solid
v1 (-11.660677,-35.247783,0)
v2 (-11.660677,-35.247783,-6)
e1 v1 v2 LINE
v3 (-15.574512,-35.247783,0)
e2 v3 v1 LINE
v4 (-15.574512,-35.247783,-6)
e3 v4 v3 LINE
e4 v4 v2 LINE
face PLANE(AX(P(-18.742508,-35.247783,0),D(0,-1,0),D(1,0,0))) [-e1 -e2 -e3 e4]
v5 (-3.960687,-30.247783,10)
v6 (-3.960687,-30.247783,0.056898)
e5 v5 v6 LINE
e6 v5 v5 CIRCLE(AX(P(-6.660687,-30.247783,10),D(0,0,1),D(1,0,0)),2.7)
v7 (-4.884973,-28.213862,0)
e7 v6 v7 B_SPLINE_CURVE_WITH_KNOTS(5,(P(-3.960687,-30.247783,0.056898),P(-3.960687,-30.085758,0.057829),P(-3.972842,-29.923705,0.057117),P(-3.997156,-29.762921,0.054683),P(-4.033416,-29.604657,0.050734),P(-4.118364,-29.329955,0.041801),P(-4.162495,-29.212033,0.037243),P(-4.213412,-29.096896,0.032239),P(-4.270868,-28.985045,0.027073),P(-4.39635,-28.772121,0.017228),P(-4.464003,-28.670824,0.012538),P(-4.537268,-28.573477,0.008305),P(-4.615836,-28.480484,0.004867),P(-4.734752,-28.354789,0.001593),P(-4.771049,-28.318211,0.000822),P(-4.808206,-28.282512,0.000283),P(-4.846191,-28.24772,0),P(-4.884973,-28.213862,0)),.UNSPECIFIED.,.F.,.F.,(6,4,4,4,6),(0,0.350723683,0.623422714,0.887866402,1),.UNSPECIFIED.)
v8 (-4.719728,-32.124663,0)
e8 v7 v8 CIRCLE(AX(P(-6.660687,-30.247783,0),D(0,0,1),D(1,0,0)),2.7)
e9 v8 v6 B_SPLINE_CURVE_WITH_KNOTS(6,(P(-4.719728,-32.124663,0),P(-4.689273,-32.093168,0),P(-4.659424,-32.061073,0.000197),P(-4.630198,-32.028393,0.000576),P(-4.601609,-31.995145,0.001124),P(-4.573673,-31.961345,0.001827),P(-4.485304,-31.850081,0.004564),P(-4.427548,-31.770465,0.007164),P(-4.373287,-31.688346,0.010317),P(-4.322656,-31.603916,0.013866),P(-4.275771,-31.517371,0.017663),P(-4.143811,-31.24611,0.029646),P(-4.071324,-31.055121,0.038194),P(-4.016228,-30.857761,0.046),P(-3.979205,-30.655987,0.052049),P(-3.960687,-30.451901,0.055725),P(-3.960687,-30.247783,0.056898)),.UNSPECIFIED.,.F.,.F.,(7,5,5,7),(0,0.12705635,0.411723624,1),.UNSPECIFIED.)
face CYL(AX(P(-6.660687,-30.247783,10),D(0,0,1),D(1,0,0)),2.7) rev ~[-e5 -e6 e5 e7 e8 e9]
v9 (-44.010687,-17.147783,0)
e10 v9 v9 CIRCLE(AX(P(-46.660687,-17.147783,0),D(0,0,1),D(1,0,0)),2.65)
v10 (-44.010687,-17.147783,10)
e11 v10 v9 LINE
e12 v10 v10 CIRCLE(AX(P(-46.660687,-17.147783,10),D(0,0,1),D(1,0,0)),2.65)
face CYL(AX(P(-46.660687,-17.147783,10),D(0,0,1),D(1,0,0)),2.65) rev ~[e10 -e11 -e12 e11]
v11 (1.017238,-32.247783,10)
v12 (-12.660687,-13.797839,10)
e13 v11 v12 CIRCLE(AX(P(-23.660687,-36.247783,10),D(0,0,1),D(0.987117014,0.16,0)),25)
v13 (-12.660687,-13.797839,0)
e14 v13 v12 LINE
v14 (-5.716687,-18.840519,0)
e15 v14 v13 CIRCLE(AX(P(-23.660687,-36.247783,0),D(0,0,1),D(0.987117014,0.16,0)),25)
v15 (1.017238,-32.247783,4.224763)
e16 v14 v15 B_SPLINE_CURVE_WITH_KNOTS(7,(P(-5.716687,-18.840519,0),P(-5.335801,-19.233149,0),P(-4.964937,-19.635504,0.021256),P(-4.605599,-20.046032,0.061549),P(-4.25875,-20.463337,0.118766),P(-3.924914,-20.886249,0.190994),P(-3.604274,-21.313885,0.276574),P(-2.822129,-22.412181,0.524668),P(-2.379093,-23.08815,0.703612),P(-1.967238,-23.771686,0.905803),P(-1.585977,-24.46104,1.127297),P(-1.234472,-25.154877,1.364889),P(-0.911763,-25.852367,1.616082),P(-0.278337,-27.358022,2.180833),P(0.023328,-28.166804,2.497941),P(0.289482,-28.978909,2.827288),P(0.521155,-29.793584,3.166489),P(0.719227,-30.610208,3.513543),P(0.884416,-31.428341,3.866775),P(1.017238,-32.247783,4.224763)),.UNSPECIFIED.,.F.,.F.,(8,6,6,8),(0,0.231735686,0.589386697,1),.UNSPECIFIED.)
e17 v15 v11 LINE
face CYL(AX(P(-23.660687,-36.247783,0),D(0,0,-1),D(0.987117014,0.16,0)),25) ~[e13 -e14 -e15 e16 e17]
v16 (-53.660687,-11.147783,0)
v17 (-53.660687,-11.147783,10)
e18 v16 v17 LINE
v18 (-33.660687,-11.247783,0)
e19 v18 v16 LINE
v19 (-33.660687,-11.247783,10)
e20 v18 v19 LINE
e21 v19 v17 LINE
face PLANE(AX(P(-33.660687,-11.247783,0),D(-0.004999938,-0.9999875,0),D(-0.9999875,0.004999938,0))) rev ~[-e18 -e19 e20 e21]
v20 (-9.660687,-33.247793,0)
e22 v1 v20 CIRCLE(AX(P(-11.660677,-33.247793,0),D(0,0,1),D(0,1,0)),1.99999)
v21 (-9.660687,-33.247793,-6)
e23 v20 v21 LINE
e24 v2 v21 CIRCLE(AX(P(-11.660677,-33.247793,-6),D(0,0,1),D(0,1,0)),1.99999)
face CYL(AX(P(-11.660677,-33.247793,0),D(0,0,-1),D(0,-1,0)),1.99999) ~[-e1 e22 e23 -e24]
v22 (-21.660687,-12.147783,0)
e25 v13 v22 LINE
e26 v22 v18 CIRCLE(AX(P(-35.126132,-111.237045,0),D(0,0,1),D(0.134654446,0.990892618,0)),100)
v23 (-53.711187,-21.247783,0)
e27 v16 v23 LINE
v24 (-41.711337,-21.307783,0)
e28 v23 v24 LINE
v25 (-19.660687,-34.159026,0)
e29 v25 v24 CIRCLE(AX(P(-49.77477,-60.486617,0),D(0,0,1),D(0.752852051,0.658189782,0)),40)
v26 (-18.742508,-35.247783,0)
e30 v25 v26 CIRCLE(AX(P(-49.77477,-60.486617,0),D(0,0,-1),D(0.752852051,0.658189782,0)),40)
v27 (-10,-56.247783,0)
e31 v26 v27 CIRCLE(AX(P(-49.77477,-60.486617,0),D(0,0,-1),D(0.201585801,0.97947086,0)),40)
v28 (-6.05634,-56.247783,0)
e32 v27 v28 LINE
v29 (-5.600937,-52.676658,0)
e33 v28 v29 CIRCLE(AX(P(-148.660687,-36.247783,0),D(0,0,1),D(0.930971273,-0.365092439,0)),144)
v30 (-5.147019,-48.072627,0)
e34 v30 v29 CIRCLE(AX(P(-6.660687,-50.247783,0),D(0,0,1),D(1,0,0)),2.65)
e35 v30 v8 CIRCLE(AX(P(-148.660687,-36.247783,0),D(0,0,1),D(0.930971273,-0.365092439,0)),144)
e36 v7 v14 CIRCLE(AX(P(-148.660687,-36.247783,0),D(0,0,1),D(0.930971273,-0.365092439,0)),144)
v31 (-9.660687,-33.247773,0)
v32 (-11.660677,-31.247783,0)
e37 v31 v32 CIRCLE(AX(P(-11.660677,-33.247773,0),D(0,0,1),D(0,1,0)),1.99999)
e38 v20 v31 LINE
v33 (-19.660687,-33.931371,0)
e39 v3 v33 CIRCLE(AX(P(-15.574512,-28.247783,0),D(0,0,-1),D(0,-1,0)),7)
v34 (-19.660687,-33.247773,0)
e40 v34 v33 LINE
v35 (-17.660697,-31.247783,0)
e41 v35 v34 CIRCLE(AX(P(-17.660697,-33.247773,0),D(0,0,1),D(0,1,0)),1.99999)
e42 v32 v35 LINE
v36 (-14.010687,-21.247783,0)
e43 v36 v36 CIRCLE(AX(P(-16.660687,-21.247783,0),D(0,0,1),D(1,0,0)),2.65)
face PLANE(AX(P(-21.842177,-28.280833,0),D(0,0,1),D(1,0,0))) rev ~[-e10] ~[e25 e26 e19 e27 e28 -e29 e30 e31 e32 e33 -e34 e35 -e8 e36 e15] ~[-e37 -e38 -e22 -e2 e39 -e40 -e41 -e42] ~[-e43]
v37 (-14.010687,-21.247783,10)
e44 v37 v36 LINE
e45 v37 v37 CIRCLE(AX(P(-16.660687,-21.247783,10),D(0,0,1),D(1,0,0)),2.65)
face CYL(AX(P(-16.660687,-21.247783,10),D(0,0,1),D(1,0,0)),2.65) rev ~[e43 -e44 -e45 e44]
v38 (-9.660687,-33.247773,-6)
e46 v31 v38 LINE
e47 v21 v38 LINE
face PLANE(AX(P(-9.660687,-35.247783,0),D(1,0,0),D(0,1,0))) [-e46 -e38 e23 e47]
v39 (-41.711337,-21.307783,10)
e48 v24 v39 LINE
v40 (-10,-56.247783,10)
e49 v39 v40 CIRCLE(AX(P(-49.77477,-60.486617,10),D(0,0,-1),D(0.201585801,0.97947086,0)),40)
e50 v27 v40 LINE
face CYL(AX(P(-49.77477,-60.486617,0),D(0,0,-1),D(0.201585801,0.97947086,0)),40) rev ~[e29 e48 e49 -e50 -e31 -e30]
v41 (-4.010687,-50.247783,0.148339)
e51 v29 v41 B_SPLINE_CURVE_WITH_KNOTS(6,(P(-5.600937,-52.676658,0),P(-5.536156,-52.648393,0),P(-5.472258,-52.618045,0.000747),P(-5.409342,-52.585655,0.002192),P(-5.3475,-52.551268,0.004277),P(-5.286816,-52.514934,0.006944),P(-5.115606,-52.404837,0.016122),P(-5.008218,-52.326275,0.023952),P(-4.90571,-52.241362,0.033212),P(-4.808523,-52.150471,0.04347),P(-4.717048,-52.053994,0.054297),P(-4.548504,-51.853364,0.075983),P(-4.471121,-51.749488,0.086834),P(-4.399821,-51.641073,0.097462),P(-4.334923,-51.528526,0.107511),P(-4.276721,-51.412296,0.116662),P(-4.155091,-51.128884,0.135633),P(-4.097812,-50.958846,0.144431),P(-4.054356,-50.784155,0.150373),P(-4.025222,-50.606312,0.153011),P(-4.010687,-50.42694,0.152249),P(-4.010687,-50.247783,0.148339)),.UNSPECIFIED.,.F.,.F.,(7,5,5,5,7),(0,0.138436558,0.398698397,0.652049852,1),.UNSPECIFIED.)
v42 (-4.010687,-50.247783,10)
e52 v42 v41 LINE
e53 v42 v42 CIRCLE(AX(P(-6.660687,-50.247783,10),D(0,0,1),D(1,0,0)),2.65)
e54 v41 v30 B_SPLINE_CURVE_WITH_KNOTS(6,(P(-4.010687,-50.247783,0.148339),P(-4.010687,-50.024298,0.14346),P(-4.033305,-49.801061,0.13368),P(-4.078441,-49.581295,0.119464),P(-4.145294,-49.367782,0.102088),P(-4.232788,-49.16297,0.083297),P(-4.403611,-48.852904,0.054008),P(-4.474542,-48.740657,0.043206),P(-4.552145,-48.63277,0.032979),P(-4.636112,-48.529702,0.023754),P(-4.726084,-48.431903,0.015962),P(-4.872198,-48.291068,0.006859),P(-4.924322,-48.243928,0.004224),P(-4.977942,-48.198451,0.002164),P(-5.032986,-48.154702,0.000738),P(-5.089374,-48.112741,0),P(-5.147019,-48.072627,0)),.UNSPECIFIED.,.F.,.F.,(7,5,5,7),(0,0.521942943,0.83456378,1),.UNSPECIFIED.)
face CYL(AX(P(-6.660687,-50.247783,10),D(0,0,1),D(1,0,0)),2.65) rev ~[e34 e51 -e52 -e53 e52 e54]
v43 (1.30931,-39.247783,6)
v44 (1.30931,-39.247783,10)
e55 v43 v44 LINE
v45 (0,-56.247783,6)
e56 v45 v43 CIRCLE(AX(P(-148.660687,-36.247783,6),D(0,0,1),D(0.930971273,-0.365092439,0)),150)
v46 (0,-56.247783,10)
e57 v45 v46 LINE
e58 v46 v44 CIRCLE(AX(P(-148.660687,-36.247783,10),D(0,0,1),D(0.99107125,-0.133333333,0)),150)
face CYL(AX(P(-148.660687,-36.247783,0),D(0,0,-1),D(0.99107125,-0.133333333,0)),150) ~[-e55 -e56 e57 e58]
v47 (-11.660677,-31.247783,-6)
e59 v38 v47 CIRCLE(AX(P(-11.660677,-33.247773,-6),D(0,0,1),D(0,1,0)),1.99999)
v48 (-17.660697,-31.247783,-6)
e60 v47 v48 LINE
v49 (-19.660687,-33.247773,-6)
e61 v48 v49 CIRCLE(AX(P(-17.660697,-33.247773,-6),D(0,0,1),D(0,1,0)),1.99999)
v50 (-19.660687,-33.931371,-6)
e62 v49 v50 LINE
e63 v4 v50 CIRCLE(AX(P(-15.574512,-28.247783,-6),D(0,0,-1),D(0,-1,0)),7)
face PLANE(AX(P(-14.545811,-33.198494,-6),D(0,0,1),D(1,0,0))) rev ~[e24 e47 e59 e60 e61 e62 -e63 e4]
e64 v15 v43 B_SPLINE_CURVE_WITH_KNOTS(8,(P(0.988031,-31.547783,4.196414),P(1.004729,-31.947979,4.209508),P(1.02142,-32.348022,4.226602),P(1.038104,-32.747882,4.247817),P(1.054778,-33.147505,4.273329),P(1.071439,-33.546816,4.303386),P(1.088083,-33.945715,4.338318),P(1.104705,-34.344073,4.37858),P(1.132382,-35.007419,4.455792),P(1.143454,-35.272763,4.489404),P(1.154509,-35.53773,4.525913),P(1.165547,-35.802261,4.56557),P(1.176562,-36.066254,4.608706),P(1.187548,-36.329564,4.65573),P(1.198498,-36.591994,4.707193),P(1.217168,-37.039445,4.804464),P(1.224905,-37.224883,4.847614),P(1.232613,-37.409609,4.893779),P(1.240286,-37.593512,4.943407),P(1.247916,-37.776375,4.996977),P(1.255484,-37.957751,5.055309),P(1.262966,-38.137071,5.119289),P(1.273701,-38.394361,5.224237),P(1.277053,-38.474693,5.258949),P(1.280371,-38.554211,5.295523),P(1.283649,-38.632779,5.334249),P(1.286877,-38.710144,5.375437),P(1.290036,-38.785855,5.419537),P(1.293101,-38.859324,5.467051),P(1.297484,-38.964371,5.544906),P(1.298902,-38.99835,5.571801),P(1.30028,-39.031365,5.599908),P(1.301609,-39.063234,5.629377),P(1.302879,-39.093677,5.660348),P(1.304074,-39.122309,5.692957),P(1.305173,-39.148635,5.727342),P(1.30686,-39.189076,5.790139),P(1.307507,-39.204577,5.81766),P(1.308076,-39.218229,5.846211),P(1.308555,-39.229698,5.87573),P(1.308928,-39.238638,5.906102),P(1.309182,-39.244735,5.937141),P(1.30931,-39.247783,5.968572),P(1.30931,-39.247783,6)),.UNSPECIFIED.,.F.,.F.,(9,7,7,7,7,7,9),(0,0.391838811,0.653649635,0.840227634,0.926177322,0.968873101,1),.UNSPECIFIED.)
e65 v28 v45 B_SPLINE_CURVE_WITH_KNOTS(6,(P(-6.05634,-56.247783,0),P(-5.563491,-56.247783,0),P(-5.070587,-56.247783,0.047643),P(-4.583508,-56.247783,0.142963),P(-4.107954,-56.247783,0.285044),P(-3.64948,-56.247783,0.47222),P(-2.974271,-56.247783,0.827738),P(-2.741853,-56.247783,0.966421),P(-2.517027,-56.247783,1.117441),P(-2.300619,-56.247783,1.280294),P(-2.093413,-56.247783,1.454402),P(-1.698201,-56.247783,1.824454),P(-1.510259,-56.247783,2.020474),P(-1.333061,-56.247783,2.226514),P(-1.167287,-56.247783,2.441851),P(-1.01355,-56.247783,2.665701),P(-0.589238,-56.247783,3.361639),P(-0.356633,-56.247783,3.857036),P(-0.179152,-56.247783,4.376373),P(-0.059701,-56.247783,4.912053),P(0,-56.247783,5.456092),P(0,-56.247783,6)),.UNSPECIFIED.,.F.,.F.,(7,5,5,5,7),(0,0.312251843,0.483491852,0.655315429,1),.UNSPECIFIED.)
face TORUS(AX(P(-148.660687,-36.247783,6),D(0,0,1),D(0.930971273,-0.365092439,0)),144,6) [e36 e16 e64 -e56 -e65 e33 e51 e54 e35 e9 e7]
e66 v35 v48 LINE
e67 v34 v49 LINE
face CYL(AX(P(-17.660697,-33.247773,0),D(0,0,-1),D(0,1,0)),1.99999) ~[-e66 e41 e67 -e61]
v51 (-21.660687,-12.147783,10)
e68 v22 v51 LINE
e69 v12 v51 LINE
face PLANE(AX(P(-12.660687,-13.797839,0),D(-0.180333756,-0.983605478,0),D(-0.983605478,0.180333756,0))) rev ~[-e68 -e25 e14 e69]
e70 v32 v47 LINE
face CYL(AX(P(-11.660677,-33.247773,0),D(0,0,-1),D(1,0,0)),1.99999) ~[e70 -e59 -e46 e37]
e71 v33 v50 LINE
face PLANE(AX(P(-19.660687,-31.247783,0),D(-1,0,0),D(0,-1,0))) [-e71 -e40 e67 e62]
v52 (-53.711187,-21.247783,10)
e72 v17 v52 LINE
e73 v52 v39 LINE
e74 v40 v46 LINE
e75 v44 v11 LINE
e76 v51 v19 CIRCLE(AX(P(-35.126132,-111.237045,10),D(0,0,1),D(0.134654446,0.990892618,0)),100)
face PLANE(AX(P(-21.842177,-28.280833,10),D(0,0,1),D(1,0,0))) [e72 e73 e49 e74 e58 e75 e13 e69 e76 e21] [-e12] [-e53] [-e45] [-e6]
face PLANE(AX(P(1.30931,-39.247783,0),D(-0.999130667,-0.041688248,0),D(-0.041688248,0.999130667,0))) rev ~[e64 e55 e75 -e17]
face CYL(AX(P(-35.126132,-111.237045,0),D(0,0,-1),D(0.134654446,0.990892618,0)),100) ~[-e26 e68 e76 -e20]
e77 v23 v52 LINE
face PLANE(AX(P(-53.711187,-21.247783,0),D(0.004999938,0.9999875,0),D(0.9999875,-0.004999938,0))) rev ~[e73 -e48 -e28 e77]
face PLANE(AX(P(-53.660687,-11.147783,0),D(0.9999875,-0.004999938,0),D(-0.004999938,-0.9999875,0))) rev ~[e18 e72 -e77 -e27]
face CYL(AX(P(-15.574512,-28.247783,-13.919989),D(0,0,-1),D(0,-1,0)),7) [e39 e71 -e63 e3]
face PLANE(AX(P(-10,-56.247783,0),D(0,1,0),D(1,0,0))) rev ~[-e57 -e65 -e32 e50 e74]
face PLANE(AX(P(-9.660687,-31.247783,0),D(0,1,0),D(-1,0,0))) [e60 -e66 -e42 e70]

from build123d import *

# Parameters (mm, degrees)
F1_DEPTH    = 10
F2_R        = 2.65
F2_R_2      = 2.7
F3_DEPTH    = 10.001
F4_T2_ANGLE = 34.0182957269
F6_DEPTH    = 6
F7_R        = 1.99999
F8_T1_DEPTH = 13.9199888123


# Not quite as in the source:
# - a fillet or chamfer that OpenCascade refuses, or shapes differently, is made with other operations: its cross-section is extruded or revolved along the edge and cut away or added
# - a fillet or chamfer is up to 0.001 mm smaller than in the source, because OpenCascade refuses the exact size


with BuildPart() as f1:
    # F0 (on Top) → F1 (new body)
    with BuildSketch(Plane.XY):
        with BuildLine():
            Line((-33.6606874732, -11.2477834763), (-53.6606874732, -11.1477834763))
            Line((-53.6606874732, -11.1477834763), (-53.7111874732, -21.2477834763))
            Line((-53.7111874732, -21.2477834763), (-41.7113374704, -21.3077827264))
            ThreePointArc((-41.7113374704, -21.3077827264), (-20.1551088941, -33.6039887965), (-10, -56.2477834763))
            Line((-10, -56.2477834763), (0, -56.2477834763))
            ThreePointArc((0, -56.2477834763), (0.8963967025, -47.7664020072), (1.3093095262, -39.2477834763))
            Line((1.3093095262, -39.2477834763), (1.0172378853, -32.2477834763))
            ThreePointArc((1.0172378853, -32.2477834763), (-3.5776423647, -21.3591536143), (-12.6606874732, -13.7978391557))
            Line((-12.6606874732, -13.7978391557), (-21.6606874732, -12.1477834763))
            ThreePointArc((-21.6606874732, -12.1477834763), (-27.6471372828, -11.5171142711), (-33.6606874732, -11.2477834763))
        make_face()
    extrude(amount=F1_DEPTH)

    # F2 (on face) → F3 (cut, through all)
    with BuildSketch(Plane.XY.offset(10)):
        with Locations((-46.6606874732, -17.1477834763)):
            Circle(F2_R)
        with Locations((-16.6606874732, -21.2477834763)):
            Circle(F2_R)
        with Locations((-6.6606874732, -50.2477834763)):
            Circle(F2_R)
        with Locations((-6.6606874732, -30.2477834763)):
            Circle(F2_R_2)
    extrude(amount=-F3_DEPTH, mode=Mode.SUBTRACT)

    # F4: fillet of radius 6 on 1 edges, made by hand

    # F4_s1 → F4_t2 (revolve, cut)
    with BuildSketch(Plane(origin=(-32.1356329931, -81.9445924317, 0), x_dir=(0, 0, 1), z_dir=(-0.3650924394, -0.9309712727, 0))):
        with BuildLine():
            ThreePointArc((0, -18.8349622687), (1.7573593129, -23.0776029558), (6, -24.8349622687))
            Line((6, -24.8349622687), (6, -24.9549622687))
            Line((6, -24.9549622687), (-0.12, -24.9549622687))
            Line((-0.12, -24.9549622687), (-0.12, -18.8349622687))
            Line((-0.12, -18.8349622687), (0, -18.8349622687))
        make_face()
    revolve(axis=Axis((-148.6606874732, -36.2477834763, 0), (0, 0, 1)), revolution_arc=F4_T2_ANGLE, mode=Mode.SUBTRACT)

    # F5 (on face) → F6 (join)
    with BuildSketch(Plane.XY):
        with BuildLine():
            ThreePointArc((-19.6606874732, -34.1590258202), (-19.1967513982, -34.6993177477), (-18.7425076385, -35.2477834763))
            Line((-18.7425076385, -35.2477834763), (-9.6606874732, -35.2477834763))
            Line((-9.6606874732, -35.2477834763), (-9.6606874732, -31.2477834763))
            Line((-9.6606874732, -31.2477834763), (-19.6606874732, -31.2477834763))
            Line((-19.6606874732, -31.2477834763), (-19.6606874732, -34.1590258202))
        make_face()
    extrude(amount=-F6_DEPTH)

    # F7 (radius 2 in the source; OpenCascade refuses exactly that, so slightly less here)
    f7_edges = [f1.edges().sort_by_distance(p)[0] for p in [
        (-19.660687, -31.247783, -3),
        (-9.660687, -31.247783, -3),
        (-9.660687, -35.247783, -3),
    ]]
    fillet(f7_edges, radius=F7_R)

    # F8: fillet of radius 7 on 1 edges, made by hand

    # F8_s2 → F8_t1 (cut)
    with BuildSketch(Plane.XY.offset(-13.9199888123)):
        with BuildLine():
            ThreePointArc((-15.5745121135, -35.2477834763), (-18.3484354275, -34.6747072699), (-20.6681674701, -33.0493118901))
            ThreePointArc((-20.6681674701, -33.0493118901), (-19.6852521083, -34.1309546714), (-18.7425076385, -35.2477834763))
            Line((-18.7425076385, -35.2477834763), (-15.5745121135, -35.2477834763))
        make_face()
    extrude(amount=F8_T1_DEPTH, mode=Mode.SUBTRACT)


solid = f1.part
